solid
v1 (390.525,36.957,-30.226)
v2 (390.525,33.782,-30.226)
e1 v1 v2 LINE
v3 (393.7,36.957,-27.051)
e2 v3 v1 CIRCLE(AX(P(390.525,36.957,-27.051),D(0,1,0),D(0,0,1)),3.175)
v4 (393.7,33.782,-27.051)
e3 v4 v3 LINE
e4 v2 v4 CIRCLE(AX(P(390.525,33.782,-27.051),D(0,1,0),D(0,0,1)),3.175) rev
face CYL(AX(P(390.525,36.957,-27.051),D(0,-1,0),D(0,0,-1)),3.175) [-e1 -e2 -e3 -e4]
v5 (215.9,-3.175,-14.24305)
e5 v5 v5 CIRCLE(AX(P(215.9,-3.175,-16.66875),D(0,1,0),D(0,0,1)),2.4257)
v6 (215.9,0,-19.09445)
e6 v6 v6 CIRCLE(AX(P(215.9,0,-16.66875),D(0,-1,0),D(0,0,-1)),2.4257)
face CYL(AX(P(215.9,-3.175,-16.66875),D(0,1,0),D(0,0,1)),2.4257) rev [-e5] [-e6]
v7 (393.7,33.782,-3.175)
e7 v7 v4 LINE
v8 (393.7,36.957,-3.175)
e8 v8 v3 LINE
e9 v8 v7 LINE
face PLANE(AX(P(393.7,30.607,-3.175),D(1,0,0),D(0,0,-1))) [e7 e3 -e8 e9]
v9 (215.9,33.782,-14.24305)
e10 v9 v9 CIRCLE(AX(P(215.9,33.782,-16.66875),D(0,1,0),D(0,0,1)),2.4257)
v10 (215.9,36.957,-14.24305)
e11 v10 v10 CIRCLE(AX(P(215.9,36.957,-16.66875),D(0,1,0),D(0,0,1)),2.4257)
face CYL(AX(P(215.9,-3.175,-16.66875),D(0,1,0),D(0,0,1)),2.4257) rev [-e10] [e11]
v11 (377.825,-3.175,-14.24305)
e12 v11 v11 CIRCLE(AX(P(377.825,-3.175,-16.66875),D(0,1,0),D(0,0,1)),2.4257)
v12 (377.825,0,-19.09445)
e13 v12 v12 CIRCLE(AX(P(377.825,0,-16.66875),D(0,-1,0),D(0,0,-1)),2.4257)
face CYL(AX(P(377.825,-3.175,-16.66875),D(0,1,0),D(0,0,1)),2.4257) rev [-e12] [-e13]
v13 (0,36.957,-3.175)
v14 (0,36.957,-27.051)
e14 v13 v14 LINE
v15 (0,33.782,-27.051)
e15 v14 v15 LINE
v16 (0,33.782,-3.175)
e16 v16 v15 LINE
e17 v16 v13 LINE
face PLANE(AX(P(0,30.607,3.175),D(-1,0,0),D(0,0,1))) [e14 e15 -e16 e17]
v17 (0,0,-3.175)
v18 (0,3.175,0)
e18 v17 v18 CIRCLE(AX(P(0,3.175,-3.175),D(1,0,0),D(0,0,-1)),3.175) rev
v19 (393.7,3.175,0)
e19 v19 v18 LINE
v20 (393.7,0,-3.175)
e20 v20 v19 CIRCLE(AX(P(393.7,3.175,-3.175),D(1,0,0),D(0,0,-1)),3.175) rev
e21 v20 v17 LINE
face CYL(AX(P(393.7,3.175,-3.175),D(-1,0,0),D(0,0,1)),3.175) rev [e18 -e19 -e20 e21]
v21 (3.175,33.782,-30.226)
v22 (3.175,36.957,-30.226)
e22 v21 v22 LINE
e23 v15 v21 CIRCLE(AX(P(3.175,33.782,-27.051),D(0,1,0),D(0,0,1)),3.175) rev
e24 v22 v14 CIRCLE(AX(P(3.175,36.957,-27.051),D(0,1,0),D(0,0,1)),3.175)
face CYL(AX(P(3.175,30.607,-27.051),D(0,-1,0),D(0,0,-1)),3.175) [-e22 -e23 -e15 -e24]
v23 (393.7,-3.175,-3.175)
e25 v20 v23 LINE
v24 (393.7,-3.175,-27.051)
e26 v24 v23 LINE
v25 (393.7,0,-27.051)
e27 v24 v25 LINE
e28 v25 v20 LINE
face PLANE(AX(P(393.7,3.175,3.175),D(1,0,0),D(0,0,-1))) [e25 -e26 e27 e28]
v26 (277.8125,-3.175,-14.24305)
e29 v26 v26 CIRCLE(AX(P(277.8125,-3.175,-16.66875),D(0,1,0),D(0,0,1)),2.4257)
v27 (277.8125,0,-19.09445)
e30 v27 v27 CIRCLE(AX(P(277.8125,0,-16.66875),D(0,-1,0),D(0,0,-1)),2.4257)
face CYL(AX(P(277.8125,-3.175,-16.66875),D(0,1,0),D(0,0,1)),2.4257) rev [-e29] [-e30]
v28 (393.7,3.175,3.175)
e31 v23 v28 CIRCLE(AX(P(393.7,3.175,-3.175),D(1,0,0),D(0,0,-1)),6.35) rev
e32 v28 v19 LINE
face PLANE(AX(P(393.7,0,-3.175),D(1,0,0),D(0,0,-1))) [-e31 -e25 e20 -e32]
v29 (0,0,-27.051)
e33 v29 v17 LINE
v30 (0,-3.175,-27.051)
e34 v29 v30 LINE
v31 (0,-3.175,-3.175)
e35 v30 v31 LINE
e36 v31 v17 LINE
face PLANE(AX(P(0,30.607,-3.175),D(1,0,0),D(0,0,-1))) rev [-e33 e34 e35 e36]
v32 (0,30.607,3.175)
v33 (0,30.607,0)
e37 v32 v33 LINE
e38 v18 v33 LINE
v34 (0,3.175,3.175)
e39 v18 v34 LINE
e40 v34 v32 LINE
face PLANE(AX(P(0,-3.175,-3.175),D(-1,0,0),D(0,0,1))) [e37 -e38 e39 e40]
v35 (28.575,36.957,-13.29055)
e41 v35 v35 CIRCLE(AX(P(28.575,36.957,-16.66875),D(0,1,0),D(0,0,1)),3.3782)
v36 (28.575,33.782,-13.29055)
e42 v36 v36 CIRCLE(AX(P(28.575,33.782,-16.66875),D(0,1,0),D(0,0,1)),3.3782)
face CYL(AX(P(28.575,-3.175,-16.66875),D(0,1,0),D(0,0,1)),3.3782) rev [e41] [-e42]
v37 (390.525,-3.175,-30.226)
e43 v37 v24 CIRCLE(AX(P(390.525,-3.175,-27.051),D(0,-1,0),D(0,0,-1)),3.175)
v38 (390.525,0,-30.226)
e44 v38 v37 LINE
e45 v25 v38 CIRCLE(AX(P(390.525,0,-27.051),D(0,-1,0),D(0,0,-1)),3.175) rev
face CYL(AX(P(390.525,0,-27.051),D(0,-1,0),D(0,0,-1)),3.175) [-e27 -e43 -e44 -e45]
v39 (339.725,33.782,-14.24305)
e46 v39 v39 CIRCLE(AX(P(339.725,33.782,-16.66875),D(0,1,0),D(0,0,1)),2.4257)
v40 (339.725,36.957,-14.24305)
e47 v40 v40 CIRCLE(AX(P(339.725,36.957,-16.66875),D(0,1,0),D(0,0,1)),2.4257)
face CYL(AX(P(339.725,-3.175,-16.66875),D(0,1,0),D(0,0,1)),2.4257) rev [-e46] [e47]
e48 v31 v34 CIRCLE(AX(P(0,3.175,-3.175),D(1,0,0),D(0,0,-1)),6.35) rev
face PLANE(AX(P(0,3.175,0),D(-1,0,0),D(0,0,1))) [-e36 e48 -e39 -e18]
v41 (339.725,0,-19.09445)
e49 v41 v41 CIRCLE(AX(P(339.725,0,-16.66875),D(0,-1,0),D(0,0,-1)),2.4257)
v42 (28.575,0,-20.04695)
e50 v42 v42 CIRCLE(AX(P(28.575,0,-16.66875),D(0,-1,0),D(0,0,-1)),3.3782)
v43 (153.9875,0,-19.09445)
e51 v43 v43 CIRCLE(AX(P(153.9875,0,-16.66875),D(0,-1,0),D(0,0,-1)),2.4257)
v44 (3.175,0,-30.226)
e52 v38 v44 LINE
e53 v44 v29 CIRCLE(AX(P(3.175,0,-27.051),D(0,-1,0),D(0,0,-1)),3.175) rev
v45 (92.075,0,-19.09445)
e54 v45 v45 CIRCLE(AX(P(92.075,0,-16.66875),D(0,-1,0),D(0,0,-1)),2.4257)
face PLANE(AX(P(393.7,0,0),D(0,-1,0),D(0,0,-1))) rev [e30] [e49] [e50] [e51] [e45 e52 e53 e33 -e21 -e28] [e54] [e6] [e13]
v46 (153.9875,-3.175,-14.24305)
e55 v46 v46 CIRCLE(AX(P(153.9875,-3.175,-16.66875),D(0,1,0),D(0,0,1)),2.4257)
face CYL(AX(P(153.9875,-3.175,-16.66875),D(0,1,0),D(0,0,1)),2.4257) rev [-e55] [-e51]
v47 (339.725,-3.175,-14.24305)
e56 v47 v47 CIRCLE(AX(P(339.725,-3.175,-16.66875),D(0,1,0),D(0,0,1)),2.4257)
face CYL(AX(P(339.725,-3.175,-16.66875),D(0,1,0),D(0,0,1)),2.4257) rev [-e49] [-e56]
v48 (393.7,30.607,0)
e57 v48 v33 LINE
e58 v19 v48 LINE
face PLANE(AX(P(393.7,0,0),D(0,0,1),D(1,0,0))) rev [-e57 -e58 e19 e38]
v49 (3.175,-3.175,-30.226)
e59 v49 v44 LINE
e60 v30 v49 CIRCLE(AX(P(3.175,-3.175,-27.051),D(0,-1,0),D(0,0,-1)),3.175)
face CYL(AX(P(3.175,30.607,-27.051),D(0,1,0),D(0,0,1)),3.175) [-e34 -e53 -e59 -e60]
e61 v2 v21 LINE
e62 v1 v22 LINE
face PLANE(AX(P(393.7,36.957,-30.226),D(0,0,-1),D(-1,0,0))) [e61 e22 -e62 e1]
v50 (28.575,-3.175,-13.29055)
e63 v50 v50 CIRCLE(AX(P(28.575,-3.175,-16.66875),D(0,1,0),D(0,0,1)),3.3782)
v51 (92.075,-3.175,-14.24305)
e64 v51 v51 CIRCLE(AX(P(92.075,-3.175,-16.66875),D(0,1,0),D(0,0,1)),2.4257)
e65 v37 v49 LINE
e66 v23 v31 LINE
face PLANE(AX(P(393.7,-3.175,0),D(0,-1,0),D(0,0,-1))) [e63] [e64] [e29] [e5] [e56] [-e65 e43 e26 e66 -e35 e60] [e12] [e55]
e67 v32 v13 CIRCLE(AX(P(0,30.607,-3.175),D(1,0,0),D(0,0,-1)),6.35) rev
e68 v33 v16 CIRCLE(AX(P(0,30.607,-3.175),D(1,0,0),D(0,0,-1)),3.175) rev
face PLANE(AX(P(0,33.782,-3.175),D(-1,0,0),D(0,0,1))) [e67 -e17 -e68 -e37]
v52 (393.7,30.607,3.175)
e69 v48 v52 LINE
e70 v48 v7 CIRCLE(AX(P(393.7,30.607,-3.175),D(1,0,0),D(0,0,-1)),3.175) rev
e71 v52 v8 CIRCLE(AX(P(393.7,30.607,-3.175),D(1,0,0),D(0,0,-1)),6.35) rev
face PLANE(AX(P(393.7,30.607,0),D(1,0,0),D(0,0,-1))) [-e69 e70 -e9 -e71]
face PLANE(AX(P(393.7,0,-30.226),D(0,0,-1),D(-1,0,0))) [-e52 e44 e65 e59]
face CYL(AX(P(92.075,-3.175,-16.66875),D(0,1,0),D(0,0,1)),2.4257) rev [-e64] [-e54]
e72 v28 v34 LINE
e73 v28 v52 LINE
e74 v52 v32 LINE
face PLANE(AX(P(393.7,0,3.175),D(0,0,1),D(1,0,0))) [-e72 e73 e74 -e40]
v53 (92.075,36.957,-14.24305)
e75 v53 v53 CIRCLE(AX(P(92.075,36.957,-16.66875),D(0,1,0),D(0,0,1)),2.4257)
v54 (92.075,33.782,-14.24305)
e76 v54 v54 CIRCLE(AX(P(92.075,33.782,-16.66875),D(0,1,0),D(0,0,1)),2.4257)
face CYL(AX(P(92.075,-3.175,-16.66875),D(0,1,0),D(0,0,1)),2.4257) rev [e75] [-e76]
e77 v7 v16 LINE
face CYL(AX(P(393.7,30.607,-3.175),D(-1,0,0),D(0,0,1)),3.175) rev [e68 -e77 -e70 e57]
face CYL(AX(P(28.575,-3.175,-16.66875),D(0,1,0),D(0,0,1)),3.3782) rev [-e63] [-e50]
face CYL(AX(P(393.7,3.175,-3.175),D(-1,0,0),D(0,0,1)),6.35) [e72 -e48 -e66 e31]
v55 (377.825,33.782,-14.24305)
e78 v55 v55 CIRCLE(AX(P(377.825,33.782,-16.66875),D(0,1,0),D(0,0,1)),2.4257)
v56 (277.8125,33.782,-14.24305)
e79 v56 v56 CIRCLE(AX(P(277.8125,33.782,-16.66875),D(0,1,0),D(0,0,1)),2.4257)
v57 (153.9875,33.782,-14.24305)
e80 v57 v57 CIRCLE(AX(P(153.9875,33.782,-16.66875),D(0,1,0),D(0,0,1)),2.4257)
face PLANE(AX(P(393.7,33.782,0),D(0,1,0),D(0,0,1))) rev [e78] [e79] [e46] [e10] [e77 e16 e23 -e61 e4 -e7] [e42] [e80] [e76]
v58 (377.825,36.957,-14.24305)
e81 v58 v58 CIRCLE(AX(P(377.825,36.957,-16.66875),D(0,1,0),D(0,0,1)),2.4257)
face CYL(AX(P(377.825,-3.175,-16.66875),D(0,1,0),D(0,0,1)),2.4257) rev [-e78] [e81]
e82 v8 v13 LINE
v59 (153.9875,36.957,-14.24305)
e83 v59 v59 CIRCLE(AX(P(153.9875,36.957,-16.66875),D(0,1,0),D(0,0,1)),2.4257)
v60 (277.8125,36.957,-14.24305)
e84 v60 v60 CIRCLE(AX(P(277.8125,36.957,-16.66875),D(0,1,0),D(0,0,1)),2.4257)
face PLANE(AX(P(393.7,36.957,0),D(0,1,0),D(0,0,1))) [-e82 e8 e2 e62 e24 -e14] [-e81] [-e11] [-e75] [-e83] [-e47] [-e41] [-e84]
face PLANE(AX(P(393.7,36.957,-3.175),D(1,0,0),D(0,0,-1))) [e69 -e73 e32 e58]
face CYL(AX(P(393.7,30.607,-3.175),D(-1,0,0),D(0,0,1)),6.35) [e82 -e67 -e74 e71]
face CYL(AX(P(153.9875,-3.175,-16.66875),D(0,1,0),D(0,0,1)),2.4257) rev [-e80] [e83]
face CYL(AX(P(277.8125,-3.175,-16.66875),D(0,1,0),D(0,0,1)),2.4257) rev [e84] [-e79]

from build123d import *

# Parameters (mm, degrees)
BASE_FLANGE1_DEPTH = 393.7
SKETCH6_R          = 3.3782
SKETCH6_R_2        = 2.4257
CUT_EXTRUDE1_DEPTH = 397.892779602
FILLET1_R          = 3.175


# Sheet-metal steps are written as plain solids
with BuildPart() as part:
    # Sketch1 → Base-Flange1 (new body)
    with BuildSketch(Plane(origin=(0, 0, 0), x_dir=(0, 0, -1), z_dir=(1, 0, 0))):
        with BuildLine():
            Line((30.226, 33.782), (3.175, 33.782))
            ThreePointArc((3.175, 33.782), (0.92993597, 32.85206403), (0, 30.607))
            Line((0, 30.607), (0, 3.175))
            ThreePointArc((0, 3.175), (0.92993597, 0.92993597), (3.175, 0))
            Line((3.175, 0), (30.226, 0))
            Line((30.226, 0), (30.226, -3.175))
            Line((30.226, -3.175), (3.175, -3.175))
            ThreePointArc((3.175, -3.175), (-1.315128061, -1.315128061), (-3.175, 3.175))
            Line((-3.175, 3.175), (-3.175, 30.607))
            ThreePointArc((-3.175, 30.607), (-1.315128061, 35.097128061), (3.175, 36.957))
            Line((3.175, 36.957), (30.226, 36.957))
            Line((30.226, 36.957), (30.226, 33.782))
        make_face()
    extrude(amount=BASE_FLANGE1_DEPTH)

    # Sketch6 → Cut-Extrude1 (cut, through all)
    with BuildSketch(Plane(origin=(0, 36.957, 0), x_dir=(1, 0, 0), z_dir=(0, 1, 0))):
        with Locations(Location((28.575, 16.66875, 0), (0, 0, 270))):
            Circle(SKETCH6_R)
        with Locations(Location((92.075, 16.66875, 0), (0, 0, 270))):
            Circle(SKETCH6_R_2)
        with Locations(Location((339.725, 16.66875, 0), (0, 0, 270))):
            Circle(SKETCH6_R_2)
        with Locations(Location((377.825, 16.66875, 0), (0, 0, 270))):
            Circle(SKETCH6_R_2)
        with Locations(Location((153.9875, 16.66875, 0), (0, 0, 270))):
            Circle(SKETCH6_R_2)
        with Locations(Location((215.9, 16.66875, 0), (0, 0, 270))):
            Circle(SKETCH6_R_2)
        with Locations(Location((277.8125, 16.66875, 0), (0, 0, 270))):
            Circle(SKETCH6_R_2)
    extrude(amount=-CUT_EXTRUDE1_DEPTH, mode=Mode.SUBTRACT)

    # Fillet1
    fillet1_edges = [part.edges().sort_by_distance(p)[0] for p in [
        (0, -1.5875, -30.226),
        (0, 35.3695, -30.226),
        (393.7, -1.5875, -30.226),
        (393.7, 35.3695, -30.226),
    ]]
    fillet(fillet1_edges, radius=FILLET1_R)


solid = part.part
